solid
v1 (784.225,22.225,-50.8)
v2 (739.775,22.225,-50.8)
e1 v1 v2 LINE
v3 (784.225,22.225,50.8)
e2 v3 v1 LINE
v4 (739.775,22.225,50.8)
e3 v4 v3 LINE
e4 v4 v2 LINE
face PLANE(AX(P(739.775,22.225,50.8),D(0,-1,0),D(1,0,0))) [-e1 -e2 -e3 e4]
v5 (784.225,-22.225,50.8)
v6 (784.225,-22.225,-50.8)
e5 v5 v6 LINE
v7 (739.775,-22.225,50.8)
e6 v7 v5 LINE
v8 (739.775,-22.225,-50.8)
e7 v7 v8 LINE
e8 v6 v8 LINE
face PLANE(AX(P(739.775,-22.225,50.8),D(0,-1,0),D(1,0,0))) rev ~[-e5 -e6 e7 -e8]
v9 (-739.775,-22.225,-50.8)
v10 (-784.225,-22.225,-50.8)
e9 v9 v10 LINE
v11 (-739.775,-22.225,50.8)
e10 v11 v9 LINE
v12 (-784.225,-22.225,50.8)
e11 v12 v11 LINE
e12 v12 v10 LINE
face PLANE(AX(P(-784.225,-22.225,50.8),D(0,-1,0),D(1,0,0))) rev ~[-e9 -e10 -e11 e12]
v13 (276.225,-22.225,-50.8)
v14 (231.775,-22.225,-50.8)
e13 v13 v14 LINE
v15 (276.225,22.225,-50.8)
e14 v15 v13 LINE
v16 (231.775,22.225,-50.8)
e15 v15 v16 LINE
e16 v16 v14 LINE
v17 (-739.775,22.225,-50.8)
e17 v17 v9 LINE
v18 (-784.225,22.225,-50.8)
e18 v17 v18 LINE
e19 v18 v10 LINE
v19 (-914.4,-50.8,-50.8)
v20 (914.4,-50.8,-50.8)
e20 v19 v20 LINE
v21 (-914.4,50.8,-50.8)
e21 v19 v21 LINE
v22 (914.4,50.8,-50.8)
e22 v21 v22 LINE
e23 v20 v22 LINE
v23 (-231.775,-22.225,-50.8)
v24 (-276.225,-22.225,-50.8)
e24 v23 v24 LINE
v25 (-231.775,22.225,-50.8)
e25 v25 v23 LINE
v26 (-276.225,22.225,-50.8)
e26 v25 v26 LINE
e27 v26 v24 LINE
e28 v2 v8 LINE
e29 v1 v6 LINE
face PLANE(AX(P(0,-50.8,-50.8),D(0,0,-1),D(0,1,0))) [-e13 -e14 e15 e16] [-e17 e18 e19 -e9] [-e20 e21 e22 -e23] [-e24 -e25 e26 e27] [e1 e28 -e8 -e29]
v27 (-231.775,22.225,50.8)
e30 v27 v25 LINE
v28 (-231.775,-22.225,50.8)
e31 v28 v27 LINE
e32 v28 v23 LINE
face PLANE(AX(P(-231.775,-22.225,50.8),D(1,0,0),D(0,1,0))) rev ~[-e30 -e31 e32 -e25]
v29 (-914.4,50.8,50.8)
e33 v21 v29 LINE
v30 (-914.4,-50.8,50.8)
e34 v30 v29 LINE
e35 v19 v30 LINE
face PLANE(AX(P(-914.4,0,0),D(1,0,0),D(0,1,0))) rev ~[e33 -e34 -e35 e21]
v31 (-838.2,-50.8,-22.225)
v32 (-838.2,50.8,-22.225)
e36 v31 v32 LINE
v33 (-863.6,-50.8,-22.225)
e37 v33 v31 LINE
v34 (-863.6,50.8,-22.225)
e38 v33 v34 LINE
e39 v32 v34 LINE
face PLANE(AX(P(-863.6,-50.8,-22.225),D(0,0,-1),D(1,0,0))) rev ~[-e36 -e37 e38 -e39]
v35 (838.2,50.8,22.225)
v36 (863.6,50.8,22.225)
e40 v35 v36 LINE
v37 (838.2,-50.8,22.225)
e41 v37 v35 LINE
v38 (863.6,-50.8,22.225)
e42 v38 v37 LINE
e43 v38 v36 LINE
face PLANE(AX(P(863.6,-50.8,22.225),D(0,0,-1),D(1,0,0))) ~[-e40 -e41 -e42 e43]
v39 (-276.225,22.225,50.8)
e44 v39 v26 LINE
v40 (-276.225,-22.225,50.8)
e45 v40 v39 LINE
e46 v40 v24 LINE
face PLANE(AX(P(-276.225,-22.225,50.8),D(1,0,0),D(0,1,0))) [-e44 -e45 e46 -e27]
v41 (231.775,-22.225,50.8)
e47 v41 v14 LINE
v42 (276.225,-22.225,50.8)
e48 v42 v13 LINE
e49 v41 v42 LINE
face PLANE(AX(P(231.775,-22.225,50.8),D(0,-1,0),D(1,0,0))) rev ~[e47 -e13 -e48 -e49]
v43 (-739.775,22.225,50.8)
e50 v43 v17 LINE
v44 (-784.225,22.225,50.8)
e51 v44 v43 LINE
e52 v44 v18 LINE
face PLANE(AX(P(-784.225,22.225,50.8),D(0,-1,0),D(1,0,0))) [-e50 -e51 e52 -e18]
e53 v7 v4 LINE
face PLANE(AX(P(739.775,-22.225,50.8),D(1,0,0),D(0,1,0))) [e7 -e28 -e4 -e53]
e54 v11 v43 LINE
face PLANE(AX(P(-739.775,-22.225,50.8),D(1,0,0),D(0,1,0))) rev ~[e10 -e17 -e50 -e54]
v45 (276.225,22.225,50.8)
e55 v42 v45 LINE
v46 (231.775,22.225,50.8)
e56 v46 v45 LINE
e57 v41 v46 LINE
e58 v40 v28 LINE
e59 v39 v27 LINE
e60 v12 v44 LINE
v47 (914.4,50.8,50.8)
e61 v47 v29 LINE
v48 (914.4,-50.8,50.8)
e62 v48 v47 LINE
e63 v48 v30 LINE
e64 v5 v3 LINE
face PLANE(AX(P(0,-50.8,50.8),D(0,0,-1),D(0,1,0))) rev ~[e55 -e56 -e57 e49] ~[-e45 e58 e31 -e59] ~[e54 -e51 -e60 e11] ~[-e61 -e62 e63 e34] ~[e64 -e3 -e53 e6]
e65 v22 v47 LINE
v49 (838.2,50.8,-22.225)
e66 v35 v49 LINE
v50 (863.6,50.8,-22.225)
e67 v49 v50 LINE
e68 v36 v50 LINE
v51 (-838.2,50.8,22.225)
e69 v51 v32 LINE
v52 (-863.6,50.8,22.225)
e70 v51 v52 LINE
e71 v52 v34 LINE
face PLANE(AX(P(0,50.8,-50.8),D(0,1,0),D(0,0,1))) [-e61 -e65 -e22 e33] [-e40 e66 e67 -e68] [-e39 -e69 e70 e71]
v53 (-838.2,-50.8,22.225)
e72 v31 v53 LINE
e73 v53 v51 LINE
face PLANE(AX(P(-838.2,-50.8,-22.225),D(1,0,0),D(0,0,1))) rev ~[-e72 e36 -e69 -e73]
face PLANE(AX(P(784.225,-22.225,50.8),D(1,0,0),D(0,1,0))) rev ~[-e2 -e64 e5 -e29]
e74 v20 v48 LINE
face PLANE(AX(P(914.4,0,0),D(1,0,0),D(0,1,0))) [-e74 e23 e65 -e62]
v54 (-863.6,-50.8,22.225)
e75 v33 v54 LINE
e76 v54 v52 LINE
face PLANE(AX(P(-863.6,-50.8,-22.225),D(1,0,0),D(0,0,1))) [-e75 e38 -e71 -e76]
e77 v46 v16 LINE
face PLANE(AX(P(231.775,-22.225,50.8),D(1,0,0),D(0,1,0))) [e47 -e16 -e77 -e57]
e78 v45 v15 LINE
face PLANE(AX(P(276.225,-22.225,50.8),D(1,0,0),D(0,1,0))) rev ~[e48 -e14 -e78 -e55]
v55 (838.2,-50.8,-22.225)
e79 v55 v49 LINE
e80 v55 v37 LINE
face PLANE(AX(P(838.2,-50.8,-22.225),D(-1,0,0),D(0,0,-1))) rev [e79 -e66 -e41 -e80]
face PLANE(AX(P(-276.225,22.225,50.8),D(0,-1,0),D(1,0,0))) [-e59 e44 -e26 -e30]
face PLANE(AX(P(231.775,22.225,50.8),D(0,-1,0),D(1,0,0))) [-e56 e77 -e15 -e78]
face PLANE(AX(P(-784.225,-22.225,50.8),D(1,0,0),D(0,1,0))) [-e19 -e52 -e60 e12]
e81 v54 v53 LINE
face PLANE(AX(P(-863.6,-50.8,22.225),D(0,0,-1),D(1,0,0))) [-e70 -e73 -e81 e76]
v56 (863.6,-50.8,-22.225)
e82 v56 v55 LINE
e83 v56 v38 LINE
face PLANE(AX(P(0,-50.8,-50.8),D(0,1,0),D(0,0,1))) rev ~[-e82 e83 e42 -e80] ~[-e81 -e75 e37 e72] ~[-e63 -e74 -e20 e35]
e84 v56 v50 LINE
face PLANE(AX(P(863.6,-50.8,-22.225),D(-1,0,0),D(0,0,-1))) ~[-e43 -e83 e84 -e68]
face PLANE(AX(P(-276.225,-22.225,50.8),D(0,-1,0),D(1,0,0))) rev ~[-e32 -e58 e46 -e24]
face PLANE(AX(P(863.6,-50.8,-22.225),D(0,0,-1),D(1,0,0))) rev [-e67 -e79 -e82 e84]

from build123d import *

# Parameters (mm, degrees)
F0_W            = 101.6
F0_H            = 101.6
F1_DEPTH        = 914.4
F2_W            = 44.45
F2_H            = 44.45
F3_DEPTH        = 101.601
F4_W            = 44.45
F4_H            = 44.45
F5_DEPTH        = 101.601
F5_COPIES_COUNT = 3
F5_COPIES_PITCH = 508
F6_W            = 25.4
F6_H            = 44.45
F7_DEPTH        = 101.601


# Not quite as in the source:
# - a pattern or mirror of a feature is missing from the dataset's text; its kind, count and spacing are read off the source's solid


with BuildPart() as f1:
    # F0 (on Right) → F1 (new body, symmetric)
    with BuildSketch(Plane.YZ):
        Rectangle(F0_W, F0_H)
    extrude(amount=F1_DEPTH, both=True)

    # F2 (on face) → F3 (cut, through all)
    with BuildSketch(Plane.XY.offset(50.8)):
        with Locations((-762, 0)):
            Rectangle(F2_W, F2_H)
    extrude(amount=-F3_DEPTH, mode=Mode.SUBTRACT)

    # F4 (on face) → F5 (cut, through all)
    with BuildSketch(Plane.XY.offset(50.8)):
        with Locations((-254, 0)):
            Rectangle(F4_W, F4_H)
    f5 = extrude(amount=-F5_DEPTH, mode=Mode.SUBTRACT)

    # F5_copies: F5 ×3
    with Locations(*[(i * F5_COPIES_PITCH, 0, 0) for i in range(1, F5_COPIES_COUNT)]):
        add(f5, mode=Mode.SUBTRACT)

    # F6 (on face) → F7 (cut, through all)
    with BuildSketch(Plane.XZ.offset(50.8)):
        with Locations((-850.9, 0)):
            Rectangle(F6_W, F6_H)
    f7 = extrude(amount=-F7_DEPTH, mode=Mode.SUBTRACT)

    # F7_copies: F7 across plane
    add(f7.mirror(Plane(origin=(0, 0, 0), x_dir=(0, 0, 1), z_dir=(1, 0, 0))), mode=Mode.SUBTRACT)


solid = f1.part
